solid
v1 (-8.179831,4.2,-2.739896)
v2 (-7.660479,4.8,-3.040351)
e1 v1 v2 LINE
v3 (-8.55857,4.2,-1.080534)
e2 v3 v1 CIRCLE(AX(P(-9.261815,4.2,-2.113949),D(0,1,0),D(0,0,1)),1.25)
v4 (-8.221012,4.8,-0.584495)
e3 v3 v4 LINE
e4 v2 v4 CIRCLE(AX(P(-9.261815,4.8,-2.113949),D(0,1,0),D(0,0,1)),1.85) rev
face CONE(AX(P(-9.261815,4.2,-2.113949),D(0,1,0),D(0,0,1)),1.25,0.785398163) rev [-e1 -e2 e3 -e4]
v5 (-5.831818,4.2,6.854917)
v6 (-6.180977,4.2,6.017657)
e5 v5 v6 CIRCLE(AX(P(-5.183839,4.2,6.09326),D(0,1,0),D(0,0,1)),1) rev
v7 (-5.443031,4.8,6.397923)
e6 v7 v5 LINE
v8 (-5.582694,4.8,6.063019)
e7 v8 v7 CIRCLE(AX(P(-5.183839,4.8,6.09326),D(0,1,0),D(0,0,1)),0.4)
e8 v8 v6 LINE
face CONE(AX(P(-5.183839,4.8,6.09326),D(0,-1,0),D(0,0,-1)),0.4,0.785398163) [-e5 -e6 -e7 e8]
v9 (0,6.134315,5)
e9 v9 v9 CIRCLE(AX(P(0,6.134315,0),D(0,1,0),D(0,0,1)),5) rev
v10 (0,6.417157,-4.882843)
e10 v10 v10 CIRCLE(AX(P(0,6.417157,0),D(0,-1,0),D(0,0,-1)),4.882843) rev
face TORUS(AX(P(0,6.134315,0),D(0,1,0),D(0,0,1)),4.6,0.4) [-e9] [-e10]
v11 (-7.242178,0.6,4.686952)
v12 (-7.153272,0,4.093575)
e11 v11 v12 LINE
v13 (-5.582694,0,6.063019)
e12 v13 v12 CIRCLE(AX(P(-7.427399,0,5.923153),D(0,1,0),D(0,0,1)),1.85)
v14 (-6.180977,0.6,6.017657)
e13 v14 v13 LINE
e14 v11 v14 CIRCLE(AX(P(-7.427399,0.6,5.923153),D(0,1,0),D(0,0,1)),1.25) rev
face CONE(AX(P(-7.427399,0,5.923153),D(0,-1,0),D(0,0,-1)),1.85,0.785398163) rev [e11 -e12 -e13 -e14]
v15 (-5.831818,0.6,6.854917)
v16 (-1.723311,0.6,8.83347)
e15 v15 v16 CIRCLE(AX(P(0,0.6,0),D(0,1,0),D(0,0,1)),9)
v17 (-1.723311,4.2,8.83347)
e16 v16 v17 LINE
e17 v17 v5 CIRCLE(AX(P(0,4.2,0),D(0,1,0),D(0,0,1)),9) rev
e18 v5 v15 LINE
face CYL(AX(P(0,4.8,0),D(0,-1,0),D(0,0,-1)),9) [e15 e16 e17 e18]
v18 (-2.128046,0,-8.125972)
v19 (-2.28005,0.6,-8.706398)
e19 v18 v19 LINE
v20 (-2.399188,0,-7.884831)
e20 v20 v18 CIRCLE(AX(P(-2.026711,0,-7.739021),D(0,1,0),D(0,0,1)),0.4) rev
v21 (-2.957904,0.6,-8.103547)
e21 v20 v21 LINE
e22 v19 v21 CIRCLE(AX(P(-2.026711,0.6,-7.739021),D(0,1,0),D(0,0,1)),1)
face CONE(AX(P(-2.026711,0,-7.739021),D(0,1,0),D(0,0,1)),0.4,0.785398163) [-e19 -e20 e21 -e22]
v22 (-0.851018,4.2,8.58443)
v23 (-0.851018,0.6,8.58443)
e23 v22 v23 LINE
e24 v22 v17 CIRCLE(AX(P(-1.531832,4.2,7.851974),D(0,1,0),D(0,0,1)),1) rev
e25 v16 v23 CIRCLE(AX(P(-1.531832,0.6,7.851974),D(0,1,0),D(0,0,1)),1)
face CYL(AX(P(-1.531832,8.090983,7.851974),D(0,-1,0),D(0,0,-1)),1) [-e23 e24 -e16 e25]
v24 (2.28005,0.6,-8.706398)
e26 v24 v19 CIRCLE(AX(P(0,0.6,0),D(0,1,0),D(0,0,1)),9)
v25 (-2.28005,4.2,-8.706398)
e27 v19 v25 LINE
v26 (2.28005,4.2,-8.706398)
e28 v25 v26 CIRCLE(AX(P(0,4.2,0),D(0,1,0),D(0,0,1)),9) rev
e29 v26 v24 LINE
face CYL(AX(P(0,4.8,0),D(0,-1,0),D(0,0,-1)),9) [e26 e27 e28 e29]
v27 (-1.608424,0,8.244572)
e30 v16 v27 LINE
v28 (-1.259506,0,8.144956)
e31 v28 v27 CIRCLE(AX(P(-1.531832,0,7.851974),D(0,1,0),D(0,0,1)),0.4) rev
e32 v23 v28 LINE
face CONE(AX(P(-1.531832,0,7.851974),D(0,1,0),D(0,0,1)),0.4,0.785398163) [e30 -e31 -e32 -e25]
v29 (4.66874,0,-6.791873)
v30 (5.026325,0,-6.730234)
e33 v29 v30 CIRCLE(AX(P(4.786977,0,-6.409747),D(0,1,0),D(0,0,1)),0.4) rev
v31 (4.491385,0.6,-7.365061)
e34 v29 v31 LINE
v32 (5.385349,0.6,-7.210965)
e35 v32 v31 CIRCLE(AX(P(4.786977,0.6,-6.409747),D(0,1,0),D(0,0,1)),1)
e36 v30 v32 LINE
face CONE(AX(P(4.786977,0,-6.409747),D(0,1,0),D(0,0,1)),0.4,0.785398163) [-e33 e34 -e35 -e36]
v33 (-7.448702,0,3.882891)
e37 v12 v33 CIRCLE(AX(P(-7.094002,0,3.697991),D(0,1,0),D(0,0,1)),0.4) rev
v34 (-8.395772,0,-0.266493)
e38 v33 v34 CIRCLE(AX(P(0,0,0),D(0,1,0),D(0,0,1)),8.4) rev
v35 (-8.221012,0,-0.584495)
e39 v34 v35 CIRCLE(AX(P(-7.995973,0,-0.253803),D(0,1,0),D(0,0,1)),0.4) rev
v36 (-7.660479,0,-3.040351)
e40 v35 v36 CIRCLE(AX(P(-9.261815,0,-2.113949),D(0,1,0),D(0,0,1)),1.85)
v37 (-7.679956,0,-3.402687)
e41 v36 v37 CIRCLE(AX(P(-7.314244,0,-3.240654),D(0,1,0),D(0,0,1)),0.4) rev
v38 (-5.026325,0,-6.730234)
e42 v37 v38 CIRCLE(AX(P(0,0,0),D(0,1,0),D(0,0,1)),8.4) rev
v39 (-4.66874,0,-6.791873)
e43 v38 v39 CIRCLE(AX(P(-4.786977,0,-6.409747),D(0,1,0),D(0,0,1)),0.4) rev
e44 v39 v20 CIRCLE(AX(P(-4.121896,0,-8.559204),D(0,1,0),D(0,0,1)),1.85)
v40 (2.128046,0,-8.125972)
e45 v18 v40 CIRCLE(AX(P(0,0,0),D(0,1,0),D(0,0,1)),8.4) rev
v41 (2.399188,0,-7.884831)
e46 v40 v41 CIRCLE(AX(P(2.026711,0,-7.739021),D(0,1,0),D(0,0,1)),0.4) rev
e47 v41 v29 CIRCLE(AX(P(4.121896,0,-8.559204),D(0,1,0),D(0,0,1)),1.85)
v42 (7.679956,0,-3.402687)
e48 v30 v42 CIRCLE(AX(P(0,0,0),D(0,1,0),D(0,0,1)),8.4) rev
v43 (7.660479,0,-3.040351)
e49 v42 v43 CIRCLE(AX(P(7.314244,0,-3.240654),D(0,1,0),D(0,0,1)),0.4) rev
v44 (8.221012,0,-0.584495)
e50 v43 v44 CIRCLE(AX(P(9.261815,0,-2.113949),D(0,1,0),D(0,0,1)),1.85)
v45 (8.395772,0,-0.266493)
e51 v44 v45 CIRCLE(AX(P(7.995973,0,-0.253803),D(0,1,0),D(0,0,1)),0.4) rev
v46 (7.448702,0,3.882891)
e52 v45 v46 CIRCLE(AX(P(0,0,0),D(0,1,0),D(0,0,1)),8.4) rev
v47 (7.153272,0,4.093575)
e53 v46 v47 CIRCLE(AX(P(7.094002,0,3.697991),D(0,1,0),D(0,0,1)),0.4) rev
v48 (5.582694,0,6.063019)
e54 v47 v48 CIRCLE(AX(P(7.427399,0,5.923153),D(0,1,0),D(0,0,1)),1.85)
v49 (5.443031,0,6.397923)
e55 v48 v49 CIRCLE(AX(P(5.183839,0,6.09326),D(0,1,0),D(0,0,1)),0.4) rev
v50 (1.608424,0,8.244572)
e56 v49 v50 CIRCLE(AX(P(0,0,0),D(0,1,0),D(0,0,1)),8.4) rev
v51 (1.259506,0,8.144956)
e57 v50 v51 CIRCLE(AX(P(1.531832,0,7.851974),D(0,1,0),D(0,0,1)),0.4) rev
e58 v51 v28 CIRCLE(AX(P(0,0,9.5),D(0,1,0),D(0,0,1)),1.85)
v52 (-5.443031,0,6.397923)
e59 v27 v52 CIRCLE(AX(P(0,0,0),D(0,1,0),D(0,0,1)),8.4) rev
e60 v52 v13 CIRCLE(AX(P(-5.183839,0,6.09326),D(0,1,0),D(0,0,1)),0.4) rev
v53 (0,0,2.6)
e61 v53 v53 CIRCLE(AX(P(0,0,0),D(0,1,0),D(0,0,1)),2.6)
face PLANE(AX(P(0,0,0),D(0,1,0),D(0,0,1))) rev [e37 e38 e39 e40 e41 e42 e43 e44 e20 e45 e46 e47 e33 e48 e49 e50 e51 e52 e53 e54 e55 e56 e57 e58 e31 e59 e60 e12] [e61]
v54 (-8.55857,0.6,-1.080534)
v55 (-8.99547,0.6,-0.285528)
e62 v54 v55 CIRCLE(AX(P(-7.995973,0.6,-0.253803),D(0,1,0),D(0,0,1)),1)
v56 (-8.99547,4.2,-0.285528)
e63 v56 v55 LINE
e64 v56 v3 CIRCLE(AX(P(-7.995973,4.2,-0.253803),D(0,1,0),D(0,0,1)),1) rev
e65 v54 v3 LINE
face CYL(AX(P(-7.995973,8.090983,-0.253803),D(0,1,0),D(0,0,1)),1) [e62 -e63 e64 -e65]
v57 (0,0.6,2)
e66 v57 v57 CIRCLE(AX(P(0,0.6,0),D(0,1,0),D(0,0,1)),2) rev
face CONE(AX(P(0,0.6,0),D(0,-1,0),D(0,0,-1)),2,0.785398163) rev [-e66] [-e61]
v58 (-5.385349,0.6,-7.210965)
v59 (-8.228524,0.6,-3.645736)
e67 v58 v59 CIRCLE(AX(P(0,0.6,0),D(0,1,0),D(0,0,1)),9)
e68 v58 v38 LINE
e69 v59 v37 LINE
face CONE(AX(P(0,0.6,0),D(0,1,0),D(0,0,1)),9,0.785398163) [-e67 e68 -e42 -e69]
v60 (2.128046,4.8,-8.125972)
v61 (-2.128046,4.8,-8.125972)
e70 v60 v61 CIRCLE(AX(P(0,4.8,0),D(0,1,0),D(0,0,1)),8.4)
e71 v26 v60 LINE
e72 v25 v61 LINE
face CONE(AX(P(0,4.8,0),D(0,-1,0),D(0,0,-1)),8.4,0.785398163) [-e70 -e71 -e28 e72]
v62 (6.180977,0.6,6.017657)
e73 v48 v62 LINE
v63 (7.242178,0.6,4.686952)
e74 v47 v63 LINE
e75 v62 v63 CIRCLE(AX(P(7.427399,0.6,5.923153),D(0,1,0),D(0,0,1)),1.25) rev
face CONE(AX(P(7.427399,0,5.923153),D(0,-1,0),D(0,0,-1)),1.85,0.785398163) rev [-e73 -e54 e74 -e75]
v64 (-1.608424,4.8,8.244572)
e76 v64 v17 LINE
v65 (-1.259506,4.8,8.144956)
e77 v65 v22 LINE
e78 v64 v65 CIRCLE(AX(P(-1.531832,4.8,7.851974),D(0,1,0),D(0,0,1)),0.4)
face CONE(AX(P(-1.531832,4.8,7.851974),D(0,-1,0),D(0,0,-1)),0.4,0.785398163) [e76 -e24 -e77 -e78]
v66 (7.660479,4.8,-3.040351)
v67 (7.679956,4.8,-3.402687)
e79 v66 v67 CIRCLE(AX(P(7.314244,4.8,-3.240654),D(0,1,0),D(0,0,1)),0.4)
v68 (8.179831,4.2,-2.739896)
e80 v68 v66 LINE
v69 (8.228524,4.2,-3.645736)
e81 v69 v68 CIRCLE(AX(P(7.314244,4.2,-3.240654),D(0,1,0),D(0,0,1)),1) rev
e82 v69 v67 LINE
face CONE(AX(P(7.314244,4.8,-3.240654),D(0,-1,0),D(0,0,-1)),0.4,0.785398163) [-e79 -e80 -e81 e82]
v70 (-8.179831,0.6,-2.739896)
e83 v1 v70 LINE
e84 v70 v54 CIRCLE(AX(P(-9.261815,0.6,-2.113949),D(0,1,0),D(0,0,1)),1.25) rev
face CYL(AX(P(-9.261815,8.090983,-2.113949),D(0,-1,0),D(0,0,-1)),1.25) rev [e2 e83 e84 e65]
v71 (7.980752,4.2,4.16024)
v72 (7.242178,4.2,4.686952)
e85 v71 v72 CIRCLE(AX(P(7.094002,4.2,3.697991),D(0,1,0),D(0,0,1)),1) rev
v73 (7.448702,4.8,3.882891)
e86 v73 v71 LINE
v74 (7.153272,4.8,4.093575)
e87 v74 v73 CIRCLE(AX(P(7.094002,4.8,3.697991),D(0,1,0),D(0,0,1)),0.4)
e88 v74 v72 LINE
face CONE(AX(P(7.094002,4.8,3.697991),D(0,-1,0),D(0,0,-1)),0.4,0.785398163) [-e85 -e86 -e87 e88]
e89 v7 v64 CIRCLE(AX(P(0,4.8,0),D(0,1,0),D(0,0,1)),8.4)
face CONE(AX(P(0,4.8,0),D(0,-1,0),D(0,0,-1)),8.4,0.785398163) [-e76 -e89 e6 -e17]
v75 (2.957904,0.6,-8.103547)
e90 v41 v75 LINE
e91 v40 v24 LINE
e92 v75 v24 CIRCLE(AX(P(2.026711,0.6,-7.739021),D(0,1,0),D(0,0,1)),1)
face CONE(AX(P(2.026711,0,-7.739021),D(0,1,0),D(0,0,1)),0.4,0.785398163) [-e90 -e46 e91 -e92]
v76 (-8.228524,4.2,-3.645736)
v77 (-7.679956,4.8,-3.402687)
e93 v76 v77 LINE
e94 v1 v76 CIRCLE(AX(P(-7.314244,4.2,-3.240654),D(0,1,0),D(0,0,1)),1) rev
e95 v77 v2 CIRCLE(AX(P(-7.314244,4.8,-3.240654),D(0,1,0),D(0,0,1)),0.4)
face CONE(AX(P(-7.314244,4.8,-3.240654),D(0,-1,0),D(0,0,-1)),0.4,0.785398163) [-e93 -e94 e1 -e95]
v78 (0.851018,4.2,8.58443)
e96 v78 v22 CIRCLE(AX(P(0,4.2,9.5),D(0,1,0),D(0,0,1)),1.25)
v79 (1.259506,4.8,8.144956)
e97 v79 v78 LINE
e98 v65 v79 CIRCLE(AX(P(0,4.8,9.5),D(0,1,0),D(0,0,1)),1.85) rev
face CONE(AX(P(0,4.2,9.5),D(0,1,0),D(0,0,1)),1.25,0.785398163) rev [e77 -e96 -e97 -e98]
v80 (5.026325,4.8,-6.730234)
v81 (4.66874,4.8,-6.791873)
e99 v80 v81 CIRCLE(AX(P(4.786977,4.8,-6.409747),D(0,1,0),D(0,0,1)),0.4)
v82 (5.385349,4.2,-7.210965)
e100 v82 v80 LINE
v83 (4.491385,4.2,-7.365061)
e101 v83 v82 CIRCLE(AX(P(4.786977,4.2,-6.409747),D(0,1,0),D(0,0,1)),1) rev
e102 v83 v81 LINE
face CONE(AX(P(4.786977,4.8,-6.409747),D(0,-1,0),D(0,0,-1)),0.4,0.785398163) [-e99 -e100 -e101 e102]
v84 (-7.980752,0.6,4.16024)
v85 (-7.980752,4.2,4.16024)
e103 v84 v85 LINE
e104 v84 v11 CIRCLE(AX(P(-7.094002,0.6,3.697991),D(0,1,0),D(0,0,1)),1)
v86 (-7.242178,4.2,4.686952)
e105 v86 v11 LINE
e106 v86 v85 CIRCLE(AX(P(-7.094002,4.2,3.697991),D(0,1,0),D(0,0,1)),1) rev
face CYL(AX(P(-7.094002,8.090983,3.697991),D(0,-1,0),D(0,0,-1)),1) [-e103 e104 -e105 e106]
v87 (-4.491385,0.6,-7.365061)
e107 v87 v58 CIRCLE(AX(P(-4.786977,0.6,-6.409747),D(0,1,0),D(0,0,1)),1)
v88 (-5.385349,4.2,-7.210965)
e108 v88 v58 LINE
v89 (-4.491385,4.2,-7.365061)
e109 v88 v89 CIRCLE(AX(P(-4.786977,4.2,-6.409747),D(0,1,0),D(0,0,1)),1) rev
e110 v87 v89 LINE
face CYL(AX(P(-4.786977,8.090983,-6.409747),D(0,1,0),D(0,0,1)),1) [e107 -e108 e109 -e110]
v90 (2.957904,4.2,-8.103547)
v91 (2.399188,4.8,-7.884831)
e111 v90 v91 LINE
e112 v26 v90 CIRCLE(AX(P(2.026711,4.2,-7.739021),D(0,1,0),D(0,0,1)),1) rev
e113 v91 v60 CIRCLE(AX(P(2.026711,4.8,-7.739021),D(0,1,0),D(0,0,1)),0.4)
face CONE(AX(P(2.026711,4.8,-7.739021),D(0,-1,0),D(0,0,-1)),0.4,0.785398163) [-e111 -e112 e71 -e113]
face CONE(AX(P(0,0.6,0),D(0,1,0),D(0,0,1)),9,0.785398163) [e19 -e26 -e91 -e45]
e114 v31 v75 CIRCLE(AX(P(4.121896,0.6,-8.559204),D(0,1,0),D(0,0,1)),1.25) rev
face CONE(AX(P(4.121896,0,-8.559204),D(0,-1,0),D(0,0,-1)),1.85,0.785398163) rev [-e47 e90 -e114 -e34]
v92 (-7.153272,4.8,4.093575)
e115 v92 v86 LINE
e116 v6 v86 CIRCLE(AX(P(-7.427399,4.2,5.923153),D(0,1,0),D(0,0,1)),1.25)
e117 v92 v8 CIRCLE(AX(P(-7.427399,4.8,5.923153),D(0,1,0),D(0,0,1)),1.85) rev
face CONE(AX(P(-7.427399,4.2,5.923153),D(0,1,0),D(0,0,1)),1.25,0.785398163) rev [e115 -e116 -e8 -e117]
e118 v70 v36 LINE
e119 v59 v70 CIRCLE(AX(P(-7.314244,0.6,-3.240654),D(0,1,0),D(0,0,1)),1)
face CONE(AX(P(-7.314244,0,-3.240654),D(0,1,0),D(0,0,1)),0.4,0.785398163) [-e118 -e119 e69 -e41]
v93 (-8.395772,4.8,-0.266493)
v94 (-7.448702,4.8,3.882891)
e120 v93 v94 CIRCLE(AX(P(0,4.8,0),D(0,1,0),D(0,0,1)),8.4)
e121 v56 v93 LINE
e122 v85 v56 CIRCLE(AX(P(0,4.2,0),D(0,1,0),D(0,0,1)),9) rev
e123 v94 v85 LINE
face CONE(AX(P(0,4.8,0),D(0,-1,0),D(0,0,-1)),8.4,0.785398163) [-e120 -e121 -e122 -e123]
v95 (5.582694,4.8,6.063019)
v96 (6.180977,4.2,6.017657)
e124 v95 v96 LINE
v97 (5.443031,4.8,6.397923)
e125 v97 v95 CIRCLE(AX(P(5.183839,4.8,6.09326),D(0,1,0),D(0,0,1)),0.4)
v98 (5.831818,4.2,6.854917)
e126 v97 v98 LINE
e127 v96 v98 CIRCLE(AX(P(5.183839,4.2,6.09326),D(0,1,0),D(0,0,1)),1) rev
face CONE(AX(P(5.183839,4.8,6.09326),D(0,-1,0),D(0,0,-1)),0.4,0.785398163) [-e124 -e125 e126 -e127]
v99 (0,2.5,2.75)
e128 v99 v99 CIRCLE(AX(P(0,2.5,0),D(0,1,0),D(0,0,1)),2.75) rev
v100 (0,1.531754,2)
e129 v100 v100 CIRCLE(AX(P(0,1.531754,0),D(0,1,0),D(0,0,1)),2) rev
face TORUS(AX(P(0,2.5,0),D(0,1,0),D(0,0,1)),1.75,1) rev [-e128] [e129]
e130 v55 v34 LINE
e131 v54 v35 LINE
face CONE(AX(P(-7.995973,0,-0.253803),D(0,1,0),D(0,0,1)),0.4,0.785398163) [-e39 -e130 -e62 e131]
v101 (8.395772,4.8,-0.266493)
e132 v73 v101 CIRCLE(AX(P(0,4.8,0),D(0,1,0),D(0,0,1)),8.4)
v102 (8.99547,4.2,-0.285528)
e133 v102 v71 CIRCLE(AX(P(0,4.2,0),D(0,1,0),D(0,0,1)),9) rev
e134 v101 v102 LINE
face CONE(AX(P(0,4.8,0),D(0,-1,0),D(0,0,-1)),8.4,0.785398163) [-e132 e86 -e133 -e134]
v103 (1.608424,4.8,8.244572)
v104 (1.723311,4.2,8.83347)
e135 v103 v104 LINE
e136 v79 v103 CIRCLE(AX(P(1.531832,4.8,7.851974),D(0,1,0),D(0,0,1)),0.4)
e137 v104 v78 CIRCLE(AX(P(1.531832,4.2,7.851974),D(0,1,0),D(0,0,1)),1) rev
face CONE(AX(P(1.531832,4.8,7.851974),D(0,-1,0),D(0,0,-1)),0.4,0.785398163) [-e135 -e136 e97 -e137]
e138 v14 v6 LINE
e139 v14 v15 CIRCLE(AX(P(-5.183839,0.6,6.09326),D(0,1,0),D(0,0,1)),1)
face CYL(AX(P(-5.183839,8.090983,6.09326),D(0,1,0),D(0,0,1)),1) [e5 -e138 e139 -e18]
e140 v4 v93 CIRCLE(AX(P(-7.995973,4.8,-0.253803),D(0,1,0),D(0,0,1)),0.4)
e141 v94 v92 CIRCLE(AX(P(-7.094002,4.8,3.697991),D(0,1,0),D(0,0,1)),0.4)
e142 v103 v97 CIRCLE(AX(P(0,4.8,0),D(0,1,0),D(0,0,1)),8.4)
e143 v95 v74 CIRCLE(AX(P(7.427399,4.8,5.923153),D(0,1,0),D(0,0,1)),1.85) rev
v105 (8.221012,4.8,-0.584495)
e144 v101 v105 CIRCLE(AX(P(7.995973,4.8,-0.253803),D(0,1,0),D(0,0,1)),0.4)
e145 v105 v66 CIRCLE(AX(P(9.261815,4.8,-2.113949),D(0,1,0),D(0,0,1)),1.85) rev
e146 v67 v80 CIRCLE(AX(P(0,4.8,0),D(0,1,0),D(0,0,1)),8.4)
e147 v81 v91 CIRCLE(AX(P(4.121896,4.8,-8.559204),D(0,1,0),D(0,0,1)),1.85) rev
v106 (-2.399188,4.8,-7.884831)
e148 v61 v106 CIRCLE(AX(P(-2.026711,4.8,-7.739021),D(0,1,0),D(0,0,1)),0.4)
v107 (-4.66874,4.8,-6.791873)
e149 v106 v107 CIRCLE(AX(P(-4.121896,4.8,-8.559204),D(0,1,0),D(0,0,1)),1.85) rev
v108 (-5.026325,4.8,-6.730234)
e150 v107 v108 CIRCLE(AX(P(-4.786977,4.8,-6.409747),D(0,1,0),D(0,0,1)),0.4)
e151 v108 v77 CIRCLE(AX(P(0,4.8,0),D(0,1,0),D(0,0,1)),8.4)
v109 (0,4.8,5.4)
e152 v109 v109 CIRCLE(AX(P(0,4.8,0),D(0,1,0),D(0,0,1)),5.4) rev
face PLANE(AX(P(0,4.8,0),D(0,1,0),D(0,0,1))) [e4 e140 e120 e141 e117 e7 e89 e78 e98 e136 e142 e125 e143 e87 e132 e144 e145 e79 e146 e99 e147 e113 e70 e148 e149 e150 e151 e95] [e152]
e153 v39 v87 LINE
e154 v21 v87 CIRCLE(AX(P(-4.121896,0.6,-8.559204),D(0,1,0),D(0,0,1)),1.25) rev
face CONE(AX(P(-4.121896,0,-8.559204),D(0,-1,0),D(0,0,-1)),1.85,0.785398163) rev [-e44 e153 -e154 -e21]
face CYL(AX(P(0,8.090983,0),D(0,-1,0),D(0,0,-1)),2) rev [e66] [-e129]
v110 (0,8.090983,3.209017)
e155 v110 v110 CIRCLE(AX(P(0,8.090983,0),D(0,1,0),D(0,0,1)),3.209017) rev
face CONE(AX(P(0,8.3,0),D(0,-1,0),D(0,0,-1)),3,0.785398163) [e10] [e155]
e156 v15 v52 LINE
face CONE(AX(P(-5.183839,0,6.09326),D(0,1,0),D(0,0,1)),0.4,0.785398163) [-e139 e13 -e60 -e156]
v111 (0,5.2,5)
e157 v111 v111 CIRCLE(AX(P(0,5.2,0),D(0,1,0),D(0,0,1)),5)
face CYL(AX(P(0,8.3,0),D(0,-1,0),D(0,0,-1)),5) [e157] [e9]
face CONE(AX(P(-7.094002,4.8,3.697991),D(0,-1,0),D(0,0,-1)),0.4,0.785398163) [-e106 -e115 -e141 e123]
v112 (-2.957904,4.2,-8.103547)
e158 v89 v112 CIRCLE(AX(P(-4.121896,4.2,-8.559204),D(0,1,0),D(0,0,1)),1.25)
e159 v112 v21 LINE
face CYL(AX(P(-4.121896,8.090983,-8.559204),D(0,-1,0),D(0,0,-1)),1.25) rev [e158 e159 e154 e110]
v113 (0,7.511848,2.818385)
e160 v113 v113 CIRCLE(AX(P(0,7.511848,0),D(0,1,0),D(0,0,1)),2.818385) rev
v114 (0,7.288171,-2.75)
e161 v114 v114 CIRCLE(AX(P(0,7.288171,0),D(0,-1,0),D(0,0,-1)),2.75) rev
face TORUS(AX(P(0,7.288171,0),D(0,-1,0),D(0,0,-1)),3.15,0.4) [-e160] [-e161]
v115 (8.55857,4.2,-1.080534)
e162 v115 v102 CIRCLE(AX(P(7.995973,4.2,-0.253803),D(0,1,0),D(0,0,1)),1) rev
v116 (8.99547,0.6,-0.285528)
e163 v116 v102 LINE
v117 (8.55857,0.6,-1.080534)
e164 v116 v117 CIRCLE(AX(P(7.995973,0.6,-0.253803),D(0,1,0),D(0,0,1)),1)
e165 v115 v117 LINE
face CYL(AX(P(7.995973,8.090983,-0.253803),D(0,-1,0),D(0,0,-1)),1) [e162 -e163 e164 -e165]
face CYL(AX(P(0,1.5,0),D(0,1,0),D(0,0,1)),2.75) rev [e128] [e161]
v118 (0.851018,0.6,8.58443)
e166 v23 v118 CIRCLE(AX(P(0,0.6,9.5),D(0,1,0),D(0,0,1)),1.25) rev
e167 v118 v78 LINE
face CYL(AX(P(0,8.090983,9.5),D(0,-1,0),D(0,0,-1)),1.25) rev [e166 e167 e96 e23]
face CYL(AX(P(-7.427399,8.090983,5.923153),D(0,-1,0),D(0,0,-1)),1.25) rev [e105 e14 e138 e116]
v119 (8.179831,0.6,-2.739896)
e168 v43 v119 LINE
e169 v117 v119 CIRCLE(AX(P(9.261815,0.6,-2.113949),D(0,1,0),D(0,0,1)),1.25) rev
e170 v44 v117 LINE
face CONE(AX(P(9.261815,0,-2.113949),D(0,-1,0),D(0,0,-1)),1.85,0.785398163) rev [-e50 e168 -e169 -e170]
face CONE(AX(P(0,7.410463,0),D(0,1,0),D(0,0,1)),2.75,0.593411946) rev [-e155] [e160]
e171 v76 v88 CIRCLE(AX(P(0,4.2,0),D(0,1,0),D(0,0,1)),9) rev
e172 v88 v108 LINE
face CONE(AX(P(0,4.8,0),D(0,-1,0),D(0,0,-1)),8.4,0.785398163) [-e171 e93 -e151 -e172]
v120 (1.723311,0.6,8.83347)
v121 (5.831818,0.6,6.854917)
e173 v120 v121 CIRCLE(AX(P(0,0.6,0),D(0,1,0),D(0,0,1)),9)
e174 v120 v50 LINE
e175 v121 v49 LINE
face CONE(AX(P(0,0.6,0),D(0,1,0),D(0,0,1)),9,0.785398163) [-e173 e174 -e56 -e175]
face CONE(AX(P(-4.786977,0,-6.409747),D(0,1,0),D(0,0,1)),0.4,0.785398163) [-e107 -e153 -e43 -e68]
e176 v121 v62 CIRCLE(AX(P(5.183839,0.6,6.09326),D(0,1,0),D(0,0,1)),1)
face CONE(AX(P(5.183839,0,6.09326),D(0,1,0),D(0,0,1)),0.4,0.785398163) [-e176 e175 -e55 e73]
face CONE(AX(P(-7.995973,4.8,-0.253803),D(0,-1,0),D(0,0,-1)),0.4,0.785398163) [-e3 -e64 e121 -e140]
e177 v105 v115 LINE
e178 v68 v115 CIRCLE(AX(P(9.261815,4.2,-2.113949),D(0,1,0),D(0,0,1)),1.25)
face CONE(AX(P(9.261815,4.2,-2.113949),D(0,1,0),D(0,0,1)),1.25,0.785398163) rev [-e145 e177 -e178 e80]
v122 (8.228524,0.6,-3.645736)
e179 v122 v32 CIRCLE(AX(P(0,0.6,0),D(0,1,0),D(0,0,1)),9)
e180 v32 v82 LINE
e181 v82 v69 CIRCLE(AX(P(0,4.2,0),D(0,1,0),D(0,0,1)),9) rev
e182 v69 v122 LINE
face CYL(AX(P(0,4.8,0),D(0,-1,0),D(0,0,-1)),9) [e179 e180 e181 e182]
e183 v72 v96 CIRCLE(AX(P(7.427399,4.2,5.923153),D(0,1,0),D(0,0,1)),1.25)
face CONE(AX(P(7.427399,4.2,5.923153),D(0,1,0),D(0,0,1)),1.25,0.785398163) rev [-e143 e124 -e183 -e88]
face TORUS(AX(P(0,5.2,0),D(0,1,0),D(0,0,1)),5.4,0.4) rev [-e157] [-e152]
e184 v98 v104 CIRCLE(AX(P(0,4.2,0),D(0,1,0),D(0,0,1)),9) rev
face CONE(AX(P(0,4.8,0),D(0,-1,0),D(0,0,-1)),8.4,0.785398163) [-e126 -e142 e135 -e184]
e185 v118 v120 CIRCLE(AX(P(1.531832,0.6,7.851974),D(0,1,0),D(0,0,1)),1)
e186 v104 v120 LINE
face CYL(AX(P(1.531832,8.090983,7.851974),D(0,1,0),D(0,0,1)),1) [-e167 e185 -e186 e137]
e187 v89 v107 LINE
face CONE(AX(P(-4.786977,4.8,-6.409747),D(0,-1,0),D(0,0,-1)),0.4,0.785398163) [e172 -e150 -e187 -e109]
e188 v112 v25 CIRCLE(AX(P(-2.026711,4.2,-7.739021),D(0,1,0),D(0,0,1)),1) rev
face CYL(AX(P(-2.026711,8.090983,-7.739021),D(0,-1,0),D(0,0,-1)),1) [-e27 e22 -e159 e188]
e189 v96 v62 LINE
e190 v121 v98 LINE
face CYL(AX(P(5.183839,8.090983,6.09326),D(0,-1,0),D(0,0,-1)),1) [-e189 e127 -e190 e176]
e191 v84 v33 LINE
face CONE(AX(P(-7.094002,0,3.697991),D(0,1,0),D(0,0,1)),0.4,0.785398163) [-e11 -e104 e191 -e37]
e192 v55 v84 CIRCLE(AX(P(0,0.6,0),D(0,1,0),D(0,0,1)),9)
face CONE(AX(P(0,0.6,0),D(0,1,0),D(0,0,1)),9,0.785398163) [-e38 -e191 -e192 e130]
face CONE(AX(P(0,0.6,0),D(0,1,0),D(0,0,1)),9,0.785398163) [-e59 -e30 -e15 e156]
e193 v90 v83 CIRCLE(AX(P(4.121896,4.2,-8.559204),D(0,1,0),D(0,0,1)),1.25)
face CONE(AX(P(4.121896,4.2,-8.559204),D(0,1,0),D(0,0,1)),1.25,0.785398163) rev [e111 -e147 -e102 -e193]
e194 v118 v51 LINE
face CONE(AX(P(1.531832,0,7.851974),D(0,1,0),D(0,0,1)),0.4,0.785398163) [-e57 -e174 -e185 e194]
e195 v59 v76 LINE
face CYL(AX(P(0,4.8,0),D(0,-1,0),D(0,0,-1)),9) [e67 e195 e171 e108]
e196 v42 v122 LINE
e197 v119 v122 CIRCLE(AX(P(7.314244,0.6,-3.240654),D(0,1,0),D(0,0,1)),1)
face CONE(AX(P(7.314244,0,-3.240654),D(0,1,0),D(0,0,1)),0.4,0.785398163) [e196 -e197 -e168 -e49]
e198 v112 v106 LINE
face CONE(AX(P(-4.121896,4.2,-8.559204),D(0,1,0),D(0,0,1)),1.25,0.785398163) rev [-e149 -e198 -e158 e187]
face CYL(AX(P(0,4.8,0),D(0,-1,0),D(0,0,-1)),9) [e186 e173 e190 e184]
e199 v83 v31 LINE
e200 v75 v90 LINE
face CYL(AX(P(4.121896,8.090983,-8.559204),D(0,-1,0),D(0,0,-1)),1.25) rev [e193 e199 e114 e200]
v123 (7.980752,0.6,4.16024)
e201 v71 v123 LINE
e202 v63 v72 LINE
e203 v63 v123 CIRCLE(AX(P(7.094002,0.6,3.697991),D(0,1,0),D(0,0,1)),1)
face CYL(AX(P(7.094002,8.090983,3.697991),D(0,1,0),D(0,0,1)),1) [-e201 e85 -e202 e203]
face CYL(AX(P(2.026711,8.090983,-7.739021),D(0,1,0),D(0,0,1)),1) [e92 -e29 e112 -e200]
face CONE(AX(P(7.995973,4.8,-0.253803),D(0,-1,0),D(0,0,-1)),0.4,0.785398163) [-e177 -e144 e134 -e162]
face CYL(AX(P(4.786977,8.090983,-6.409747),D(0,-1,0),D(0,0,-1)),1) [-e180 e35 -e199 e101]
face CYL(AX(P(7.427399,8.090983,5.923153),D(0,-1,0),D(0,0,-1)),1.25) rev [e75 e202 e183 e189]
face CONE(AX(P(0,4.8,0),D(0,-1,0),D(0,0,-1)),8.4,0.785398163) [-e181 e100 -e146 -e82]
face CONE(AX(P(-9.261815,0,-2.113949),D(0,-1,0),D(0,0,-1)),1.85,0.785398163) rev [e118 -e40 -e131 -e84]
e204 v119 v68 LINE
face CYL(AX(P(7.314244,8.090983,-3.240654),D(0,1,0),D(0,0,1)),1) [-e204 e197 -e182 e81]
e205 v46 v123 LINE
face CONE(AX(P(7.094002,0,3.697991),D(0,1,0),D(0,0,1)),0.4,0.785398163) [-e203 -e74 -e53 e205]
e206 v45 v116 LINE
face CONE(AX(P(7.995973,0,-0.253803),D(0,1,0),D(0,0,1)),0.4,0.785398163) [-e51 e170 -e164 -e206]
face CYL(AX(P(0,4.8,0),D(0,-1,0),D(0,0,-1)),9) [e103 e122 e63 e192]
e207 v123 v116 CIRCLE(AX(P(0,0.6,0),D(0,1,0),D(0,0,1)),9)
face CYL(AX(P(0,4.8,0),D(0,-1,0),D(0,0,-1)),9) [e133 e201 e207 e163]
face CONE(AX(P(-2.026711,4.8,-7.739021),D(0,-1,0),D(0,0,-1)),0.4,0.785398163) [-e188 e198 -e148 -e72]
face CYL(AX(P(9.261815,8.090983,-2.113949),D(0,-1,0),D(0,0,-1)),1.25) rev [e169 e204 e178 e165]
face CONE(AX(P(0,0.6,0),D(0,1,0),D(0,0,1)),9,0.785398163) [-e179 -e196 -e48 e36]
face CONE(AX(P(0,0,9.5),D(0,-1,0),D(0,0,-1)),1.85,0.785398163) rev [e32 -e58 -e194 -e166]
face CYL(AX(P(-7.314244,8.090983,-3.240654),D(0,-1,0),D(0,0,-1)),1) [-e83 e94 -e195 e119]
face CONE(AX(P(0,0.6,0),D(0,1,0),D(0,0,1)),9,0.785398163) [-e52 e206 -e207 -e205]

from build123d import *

# Parameters (mm, degrees)
SKETCH1_R           = 9
BOSS_EXTRUDE1_DEPTH = 4.8
SKETCH2_R           = 5
BOSS_EXTRUDE2_DEPTH = 3.5
SKETCH3_R           = 2.75
CUT_EXTRUDE1_DEPTH  = 6.8
CHAMFER1_SIZE       = 2
CHAMFER2_SIZE       = 0.6
CHAMFER2_SIZE_2     = 0.889536581
SKETCH4_R           = 1.25
CUT_EXTRUDE2_DEPTH  = 16.081910128
CIRPATTERN1_COUNT   = 7
FILLET1_R           = 1
SKETCH5_R           = 2
CUT_EXTRUDE3_DEPTH  = 16.081910248
CHAMFER3_SIZE       = 0.6
FILLET2_R           = 0.4


with BuildPart() as part:
    # Sketch1 → Boss-Extrude1 (new body)
    with BuildSketch(Plane(origin=(0, 0, 0), x_dir=(1, 0, 0), z_dir=(0, 1, 0))):
        with Locations(Location((0, 0, 0), (0, 0, 270))):
            Circle(SKETCH1_R)
    extrude(amount=BOSS_EXTRUDE1_DEPTH)

    # Sketch2 → Boss-Extrude2 (add)
    with BuildSketch(Plane(origin=(0, 4.8, 0), x_dir=(1, 0, 0), z_dir=(0, 1, 0))):
        with Locations(Location((0, 0, 0), (0, 0, 270))):
            Circle(SKETCH2_R)
    extrude(amount=BOSS_EXTRUDE2_DEPTH)

    # Sketch3 → Cut-Extrude1 (cut)
    with BuildSketch(Plane(origin=(0, 8.3, 0), x_dir=(1, 0, 0), z_dir=(0, 1, 0))):
        with Locations(Location((0, 0, 0), (0, 0, 270))):
            Circle(SKETCH3_R)
    extrude(amount=-CUT_EXTRUDE1_DEPTH, mode=Mode.SUBTRACT)

    # Chamfer1
    chamfer1_edges = [part.edges().sort_by_distance(p)[0] for p in [
        (0, 8.3, -5),
    ]]
    chamfer(chamfer1_edges, length=CHAMFER1_SIZE)

    # Chamfer2
    # the kernel refuses this chamfer: 0.889536581, 0.6 mm, written as the material it takes off along each edge
    with BuildSketch(Plane(origin=(0, 8.3, 0), x_dir=(0, 0, 1), z_dir=(-1, 0, 0))) as chamfer2_piece_1:
        Polygon((2.75 + CHAMFER2_SIZE, 0), (2.75, -CHAMFER2_SIZE_2), (2.75, 0), align=None)
    revolve(axis=Axis((0, 8.3, 0), (0, 1, 0)), mode=Mode.SUBTRACT)

    # Sketch4 → Cut-Extrude2 (cut, through all)
    with BuildSketch(Plane.XZ):
        with Locations((0, 9.5)):
            Circle(SKETCH4_R)
    cut_extrude2 = extrude(amount=-CUT_EXTRUDE2_DEPTH, mode=Mode.SUBTRACT)

    # CirPattern1: Cut-Extrude2 ×7 about axis
    cirpattern1_axis = Axis((0, 0, 0), (0, 1, 0))
    for i in range(1, CIRPATTERN1_COUNT):
        add(cut_extrude2.rotate(cirpattern1_axis, i * 360 / CIRPATTERN1_COUNT), mode=Mode.SUBTRACT)

    # Fillet1
    fillet1_edges = [part.edges().sort_by_distance(p)[0] for p in [
        (0, 1.5, -2.75),
        (-1.112946158, 2.4, 8.930921053),
        (1.112946158, 2.4, 8.930921053),
        (6.288564667, 2.4, 6.438474543),
        (7.676385826, 2.4, 4.698201853),
        (8.954658034, 2.4, -0.902274619),
        (8.459350397, 2.4, -3.072359168),
        (4.877711261, 2.4, -7.563592589),
        (2.87225158, 2.4, -8.529371071),
        (-2.87225158, 2.4, -8.529371071),
        (-4.877711261, 2.4, -7.563592589),
        (-8.459350397, 2.4, -3.072359168),
        (-8.954658034, 2.4, -0.902274619),
        (-7.676385826, 2.4, 4.698201853),
        (-6.288564667, 2.4, 6.438474543),
    ]]
    fillet(fillet1_edges, radius=FILLET1_R)

    # Sketch5 → Cut-Extrude3 (cut, through all)
    with BuildSketch(Plane.XZ):
        with Locations(Location((0, 0, 0), (0, 0, 270))):
            Circle(SKETCH5_R)
    extrude(amount=-CUT_EXTRUDE3_DEPTH, mode=Mode.SUBTRACT)

    # Chamfer3
    chamfer3_edges = [part.edges().sort_by_distance(p)[0] for p in [
        (-7.674626305, 0, 4.512162546),
        (-6.106798223, 0, 6.478156776),
        (-1.257300502, 0, 8.813551793),
        (1.257300502, 0, 8.813551793),
        (0, 4.8, 8.25),
        (6.45010973, 4.8, 5.143790865),
        (8.77435121, 4.8, 2.002688406),
        (8.043155276, 4.8, -1.835797705),
        (7.036483342, 4.8, -5.611408217),
        (3.579540848, 4.8, -7.43299316),
        (0, 4.8, -9),
        (-3.579540848, 4.8, -7.43299316),
        (-7.036483342, 4.8, -5.611408217),
        (-8.043155276, 4.8, -1.835797705),
        (-8.77435121, 4.8, 2.002688406),
        (-6.45010973, 4.8, 5.143790865),
        (-3.904953652, 4.8, 8.108719811),
        (6.106798223, 4.8, 6.478156776),
        (7.674626305, 4.8, 4.512162546),
        (8.87235333, 4.8, -0.735422423),
        (8.312801966, 4.8, -3.18697713),
        (4.956845417, 4.8, -7.395213538),
        (2.691268197, 4.8, -8.486258024),
        (-2.691268197, 4.8, -8.486258024),
        (-4.956845417, 4.8, -7.395213538),
        (-8.312801966, 4.8, -3.18697713),
        (-8.87235333, 4.8, -0.735422423),
        (-7.674626305, 4.8, 4.512162546),
        (-6.106798223, 4.8, 6.478156776),
        (-1.257300502, 4.8, 8.813551793),
        (1.257300502, 4.8, 8.813551793),
        (0, 0, 2),
        (3.904953652, 0, 8.108719811),
        (3.904953652, 4.8, 8.108719811),
        (8.77435121, 0, 2.002688406),
        (6.45010973, 0, 5.143790865),
        (0, 0, 8.25),
        (-3.904953652, 0, 8.108719811),
        (-6.45010973, 0, 5.143790865),
        (-8.77435121, 0, 2.002688406),
        (-8.043155276, 0, -1.835797705),
        (-7.036483342, 0, -5.611408217),
        (-3.579540848, 0, -7.43299316),
        (0, 0, -9),
        (3.579540848, 0, -7.43299316),
        (7.036483342, 0, -5.611408217),
        (8.043155276, 0, -1.835797705),
        (6.106798223, 0, 6.478156776),
        (7.674626305, 0, 4.512162546),
        (8.87235333, 0, -0.735422423),
        (8.312801966, 0, -3.18697713),
        (4.956845417, 0, -7.395213538),
        (2.691268197, 0, -8.486258024),
        (-2.691268197, 0, -8.486258024),
        (-4.956845417, 0, -7.395213538),
        (-8.312801966, 0, -3.18697713),
        (-8.87235333, 0, -0.735422423),
    ]]
    chamfer(chamfer3_edges, length=CHAMFER3_SIZE)

    # Fillet2
    fillet2_edges = [part.edges().sort_by_distance(p)[0] for p in [
        (0, 6.3, -5),
        (0, 7.410463419, -2.75),
        (0, 4.8, -5),
    ]]
    fillet(fillet2_edges, radius=FILLET2_R)


solid = part.part
